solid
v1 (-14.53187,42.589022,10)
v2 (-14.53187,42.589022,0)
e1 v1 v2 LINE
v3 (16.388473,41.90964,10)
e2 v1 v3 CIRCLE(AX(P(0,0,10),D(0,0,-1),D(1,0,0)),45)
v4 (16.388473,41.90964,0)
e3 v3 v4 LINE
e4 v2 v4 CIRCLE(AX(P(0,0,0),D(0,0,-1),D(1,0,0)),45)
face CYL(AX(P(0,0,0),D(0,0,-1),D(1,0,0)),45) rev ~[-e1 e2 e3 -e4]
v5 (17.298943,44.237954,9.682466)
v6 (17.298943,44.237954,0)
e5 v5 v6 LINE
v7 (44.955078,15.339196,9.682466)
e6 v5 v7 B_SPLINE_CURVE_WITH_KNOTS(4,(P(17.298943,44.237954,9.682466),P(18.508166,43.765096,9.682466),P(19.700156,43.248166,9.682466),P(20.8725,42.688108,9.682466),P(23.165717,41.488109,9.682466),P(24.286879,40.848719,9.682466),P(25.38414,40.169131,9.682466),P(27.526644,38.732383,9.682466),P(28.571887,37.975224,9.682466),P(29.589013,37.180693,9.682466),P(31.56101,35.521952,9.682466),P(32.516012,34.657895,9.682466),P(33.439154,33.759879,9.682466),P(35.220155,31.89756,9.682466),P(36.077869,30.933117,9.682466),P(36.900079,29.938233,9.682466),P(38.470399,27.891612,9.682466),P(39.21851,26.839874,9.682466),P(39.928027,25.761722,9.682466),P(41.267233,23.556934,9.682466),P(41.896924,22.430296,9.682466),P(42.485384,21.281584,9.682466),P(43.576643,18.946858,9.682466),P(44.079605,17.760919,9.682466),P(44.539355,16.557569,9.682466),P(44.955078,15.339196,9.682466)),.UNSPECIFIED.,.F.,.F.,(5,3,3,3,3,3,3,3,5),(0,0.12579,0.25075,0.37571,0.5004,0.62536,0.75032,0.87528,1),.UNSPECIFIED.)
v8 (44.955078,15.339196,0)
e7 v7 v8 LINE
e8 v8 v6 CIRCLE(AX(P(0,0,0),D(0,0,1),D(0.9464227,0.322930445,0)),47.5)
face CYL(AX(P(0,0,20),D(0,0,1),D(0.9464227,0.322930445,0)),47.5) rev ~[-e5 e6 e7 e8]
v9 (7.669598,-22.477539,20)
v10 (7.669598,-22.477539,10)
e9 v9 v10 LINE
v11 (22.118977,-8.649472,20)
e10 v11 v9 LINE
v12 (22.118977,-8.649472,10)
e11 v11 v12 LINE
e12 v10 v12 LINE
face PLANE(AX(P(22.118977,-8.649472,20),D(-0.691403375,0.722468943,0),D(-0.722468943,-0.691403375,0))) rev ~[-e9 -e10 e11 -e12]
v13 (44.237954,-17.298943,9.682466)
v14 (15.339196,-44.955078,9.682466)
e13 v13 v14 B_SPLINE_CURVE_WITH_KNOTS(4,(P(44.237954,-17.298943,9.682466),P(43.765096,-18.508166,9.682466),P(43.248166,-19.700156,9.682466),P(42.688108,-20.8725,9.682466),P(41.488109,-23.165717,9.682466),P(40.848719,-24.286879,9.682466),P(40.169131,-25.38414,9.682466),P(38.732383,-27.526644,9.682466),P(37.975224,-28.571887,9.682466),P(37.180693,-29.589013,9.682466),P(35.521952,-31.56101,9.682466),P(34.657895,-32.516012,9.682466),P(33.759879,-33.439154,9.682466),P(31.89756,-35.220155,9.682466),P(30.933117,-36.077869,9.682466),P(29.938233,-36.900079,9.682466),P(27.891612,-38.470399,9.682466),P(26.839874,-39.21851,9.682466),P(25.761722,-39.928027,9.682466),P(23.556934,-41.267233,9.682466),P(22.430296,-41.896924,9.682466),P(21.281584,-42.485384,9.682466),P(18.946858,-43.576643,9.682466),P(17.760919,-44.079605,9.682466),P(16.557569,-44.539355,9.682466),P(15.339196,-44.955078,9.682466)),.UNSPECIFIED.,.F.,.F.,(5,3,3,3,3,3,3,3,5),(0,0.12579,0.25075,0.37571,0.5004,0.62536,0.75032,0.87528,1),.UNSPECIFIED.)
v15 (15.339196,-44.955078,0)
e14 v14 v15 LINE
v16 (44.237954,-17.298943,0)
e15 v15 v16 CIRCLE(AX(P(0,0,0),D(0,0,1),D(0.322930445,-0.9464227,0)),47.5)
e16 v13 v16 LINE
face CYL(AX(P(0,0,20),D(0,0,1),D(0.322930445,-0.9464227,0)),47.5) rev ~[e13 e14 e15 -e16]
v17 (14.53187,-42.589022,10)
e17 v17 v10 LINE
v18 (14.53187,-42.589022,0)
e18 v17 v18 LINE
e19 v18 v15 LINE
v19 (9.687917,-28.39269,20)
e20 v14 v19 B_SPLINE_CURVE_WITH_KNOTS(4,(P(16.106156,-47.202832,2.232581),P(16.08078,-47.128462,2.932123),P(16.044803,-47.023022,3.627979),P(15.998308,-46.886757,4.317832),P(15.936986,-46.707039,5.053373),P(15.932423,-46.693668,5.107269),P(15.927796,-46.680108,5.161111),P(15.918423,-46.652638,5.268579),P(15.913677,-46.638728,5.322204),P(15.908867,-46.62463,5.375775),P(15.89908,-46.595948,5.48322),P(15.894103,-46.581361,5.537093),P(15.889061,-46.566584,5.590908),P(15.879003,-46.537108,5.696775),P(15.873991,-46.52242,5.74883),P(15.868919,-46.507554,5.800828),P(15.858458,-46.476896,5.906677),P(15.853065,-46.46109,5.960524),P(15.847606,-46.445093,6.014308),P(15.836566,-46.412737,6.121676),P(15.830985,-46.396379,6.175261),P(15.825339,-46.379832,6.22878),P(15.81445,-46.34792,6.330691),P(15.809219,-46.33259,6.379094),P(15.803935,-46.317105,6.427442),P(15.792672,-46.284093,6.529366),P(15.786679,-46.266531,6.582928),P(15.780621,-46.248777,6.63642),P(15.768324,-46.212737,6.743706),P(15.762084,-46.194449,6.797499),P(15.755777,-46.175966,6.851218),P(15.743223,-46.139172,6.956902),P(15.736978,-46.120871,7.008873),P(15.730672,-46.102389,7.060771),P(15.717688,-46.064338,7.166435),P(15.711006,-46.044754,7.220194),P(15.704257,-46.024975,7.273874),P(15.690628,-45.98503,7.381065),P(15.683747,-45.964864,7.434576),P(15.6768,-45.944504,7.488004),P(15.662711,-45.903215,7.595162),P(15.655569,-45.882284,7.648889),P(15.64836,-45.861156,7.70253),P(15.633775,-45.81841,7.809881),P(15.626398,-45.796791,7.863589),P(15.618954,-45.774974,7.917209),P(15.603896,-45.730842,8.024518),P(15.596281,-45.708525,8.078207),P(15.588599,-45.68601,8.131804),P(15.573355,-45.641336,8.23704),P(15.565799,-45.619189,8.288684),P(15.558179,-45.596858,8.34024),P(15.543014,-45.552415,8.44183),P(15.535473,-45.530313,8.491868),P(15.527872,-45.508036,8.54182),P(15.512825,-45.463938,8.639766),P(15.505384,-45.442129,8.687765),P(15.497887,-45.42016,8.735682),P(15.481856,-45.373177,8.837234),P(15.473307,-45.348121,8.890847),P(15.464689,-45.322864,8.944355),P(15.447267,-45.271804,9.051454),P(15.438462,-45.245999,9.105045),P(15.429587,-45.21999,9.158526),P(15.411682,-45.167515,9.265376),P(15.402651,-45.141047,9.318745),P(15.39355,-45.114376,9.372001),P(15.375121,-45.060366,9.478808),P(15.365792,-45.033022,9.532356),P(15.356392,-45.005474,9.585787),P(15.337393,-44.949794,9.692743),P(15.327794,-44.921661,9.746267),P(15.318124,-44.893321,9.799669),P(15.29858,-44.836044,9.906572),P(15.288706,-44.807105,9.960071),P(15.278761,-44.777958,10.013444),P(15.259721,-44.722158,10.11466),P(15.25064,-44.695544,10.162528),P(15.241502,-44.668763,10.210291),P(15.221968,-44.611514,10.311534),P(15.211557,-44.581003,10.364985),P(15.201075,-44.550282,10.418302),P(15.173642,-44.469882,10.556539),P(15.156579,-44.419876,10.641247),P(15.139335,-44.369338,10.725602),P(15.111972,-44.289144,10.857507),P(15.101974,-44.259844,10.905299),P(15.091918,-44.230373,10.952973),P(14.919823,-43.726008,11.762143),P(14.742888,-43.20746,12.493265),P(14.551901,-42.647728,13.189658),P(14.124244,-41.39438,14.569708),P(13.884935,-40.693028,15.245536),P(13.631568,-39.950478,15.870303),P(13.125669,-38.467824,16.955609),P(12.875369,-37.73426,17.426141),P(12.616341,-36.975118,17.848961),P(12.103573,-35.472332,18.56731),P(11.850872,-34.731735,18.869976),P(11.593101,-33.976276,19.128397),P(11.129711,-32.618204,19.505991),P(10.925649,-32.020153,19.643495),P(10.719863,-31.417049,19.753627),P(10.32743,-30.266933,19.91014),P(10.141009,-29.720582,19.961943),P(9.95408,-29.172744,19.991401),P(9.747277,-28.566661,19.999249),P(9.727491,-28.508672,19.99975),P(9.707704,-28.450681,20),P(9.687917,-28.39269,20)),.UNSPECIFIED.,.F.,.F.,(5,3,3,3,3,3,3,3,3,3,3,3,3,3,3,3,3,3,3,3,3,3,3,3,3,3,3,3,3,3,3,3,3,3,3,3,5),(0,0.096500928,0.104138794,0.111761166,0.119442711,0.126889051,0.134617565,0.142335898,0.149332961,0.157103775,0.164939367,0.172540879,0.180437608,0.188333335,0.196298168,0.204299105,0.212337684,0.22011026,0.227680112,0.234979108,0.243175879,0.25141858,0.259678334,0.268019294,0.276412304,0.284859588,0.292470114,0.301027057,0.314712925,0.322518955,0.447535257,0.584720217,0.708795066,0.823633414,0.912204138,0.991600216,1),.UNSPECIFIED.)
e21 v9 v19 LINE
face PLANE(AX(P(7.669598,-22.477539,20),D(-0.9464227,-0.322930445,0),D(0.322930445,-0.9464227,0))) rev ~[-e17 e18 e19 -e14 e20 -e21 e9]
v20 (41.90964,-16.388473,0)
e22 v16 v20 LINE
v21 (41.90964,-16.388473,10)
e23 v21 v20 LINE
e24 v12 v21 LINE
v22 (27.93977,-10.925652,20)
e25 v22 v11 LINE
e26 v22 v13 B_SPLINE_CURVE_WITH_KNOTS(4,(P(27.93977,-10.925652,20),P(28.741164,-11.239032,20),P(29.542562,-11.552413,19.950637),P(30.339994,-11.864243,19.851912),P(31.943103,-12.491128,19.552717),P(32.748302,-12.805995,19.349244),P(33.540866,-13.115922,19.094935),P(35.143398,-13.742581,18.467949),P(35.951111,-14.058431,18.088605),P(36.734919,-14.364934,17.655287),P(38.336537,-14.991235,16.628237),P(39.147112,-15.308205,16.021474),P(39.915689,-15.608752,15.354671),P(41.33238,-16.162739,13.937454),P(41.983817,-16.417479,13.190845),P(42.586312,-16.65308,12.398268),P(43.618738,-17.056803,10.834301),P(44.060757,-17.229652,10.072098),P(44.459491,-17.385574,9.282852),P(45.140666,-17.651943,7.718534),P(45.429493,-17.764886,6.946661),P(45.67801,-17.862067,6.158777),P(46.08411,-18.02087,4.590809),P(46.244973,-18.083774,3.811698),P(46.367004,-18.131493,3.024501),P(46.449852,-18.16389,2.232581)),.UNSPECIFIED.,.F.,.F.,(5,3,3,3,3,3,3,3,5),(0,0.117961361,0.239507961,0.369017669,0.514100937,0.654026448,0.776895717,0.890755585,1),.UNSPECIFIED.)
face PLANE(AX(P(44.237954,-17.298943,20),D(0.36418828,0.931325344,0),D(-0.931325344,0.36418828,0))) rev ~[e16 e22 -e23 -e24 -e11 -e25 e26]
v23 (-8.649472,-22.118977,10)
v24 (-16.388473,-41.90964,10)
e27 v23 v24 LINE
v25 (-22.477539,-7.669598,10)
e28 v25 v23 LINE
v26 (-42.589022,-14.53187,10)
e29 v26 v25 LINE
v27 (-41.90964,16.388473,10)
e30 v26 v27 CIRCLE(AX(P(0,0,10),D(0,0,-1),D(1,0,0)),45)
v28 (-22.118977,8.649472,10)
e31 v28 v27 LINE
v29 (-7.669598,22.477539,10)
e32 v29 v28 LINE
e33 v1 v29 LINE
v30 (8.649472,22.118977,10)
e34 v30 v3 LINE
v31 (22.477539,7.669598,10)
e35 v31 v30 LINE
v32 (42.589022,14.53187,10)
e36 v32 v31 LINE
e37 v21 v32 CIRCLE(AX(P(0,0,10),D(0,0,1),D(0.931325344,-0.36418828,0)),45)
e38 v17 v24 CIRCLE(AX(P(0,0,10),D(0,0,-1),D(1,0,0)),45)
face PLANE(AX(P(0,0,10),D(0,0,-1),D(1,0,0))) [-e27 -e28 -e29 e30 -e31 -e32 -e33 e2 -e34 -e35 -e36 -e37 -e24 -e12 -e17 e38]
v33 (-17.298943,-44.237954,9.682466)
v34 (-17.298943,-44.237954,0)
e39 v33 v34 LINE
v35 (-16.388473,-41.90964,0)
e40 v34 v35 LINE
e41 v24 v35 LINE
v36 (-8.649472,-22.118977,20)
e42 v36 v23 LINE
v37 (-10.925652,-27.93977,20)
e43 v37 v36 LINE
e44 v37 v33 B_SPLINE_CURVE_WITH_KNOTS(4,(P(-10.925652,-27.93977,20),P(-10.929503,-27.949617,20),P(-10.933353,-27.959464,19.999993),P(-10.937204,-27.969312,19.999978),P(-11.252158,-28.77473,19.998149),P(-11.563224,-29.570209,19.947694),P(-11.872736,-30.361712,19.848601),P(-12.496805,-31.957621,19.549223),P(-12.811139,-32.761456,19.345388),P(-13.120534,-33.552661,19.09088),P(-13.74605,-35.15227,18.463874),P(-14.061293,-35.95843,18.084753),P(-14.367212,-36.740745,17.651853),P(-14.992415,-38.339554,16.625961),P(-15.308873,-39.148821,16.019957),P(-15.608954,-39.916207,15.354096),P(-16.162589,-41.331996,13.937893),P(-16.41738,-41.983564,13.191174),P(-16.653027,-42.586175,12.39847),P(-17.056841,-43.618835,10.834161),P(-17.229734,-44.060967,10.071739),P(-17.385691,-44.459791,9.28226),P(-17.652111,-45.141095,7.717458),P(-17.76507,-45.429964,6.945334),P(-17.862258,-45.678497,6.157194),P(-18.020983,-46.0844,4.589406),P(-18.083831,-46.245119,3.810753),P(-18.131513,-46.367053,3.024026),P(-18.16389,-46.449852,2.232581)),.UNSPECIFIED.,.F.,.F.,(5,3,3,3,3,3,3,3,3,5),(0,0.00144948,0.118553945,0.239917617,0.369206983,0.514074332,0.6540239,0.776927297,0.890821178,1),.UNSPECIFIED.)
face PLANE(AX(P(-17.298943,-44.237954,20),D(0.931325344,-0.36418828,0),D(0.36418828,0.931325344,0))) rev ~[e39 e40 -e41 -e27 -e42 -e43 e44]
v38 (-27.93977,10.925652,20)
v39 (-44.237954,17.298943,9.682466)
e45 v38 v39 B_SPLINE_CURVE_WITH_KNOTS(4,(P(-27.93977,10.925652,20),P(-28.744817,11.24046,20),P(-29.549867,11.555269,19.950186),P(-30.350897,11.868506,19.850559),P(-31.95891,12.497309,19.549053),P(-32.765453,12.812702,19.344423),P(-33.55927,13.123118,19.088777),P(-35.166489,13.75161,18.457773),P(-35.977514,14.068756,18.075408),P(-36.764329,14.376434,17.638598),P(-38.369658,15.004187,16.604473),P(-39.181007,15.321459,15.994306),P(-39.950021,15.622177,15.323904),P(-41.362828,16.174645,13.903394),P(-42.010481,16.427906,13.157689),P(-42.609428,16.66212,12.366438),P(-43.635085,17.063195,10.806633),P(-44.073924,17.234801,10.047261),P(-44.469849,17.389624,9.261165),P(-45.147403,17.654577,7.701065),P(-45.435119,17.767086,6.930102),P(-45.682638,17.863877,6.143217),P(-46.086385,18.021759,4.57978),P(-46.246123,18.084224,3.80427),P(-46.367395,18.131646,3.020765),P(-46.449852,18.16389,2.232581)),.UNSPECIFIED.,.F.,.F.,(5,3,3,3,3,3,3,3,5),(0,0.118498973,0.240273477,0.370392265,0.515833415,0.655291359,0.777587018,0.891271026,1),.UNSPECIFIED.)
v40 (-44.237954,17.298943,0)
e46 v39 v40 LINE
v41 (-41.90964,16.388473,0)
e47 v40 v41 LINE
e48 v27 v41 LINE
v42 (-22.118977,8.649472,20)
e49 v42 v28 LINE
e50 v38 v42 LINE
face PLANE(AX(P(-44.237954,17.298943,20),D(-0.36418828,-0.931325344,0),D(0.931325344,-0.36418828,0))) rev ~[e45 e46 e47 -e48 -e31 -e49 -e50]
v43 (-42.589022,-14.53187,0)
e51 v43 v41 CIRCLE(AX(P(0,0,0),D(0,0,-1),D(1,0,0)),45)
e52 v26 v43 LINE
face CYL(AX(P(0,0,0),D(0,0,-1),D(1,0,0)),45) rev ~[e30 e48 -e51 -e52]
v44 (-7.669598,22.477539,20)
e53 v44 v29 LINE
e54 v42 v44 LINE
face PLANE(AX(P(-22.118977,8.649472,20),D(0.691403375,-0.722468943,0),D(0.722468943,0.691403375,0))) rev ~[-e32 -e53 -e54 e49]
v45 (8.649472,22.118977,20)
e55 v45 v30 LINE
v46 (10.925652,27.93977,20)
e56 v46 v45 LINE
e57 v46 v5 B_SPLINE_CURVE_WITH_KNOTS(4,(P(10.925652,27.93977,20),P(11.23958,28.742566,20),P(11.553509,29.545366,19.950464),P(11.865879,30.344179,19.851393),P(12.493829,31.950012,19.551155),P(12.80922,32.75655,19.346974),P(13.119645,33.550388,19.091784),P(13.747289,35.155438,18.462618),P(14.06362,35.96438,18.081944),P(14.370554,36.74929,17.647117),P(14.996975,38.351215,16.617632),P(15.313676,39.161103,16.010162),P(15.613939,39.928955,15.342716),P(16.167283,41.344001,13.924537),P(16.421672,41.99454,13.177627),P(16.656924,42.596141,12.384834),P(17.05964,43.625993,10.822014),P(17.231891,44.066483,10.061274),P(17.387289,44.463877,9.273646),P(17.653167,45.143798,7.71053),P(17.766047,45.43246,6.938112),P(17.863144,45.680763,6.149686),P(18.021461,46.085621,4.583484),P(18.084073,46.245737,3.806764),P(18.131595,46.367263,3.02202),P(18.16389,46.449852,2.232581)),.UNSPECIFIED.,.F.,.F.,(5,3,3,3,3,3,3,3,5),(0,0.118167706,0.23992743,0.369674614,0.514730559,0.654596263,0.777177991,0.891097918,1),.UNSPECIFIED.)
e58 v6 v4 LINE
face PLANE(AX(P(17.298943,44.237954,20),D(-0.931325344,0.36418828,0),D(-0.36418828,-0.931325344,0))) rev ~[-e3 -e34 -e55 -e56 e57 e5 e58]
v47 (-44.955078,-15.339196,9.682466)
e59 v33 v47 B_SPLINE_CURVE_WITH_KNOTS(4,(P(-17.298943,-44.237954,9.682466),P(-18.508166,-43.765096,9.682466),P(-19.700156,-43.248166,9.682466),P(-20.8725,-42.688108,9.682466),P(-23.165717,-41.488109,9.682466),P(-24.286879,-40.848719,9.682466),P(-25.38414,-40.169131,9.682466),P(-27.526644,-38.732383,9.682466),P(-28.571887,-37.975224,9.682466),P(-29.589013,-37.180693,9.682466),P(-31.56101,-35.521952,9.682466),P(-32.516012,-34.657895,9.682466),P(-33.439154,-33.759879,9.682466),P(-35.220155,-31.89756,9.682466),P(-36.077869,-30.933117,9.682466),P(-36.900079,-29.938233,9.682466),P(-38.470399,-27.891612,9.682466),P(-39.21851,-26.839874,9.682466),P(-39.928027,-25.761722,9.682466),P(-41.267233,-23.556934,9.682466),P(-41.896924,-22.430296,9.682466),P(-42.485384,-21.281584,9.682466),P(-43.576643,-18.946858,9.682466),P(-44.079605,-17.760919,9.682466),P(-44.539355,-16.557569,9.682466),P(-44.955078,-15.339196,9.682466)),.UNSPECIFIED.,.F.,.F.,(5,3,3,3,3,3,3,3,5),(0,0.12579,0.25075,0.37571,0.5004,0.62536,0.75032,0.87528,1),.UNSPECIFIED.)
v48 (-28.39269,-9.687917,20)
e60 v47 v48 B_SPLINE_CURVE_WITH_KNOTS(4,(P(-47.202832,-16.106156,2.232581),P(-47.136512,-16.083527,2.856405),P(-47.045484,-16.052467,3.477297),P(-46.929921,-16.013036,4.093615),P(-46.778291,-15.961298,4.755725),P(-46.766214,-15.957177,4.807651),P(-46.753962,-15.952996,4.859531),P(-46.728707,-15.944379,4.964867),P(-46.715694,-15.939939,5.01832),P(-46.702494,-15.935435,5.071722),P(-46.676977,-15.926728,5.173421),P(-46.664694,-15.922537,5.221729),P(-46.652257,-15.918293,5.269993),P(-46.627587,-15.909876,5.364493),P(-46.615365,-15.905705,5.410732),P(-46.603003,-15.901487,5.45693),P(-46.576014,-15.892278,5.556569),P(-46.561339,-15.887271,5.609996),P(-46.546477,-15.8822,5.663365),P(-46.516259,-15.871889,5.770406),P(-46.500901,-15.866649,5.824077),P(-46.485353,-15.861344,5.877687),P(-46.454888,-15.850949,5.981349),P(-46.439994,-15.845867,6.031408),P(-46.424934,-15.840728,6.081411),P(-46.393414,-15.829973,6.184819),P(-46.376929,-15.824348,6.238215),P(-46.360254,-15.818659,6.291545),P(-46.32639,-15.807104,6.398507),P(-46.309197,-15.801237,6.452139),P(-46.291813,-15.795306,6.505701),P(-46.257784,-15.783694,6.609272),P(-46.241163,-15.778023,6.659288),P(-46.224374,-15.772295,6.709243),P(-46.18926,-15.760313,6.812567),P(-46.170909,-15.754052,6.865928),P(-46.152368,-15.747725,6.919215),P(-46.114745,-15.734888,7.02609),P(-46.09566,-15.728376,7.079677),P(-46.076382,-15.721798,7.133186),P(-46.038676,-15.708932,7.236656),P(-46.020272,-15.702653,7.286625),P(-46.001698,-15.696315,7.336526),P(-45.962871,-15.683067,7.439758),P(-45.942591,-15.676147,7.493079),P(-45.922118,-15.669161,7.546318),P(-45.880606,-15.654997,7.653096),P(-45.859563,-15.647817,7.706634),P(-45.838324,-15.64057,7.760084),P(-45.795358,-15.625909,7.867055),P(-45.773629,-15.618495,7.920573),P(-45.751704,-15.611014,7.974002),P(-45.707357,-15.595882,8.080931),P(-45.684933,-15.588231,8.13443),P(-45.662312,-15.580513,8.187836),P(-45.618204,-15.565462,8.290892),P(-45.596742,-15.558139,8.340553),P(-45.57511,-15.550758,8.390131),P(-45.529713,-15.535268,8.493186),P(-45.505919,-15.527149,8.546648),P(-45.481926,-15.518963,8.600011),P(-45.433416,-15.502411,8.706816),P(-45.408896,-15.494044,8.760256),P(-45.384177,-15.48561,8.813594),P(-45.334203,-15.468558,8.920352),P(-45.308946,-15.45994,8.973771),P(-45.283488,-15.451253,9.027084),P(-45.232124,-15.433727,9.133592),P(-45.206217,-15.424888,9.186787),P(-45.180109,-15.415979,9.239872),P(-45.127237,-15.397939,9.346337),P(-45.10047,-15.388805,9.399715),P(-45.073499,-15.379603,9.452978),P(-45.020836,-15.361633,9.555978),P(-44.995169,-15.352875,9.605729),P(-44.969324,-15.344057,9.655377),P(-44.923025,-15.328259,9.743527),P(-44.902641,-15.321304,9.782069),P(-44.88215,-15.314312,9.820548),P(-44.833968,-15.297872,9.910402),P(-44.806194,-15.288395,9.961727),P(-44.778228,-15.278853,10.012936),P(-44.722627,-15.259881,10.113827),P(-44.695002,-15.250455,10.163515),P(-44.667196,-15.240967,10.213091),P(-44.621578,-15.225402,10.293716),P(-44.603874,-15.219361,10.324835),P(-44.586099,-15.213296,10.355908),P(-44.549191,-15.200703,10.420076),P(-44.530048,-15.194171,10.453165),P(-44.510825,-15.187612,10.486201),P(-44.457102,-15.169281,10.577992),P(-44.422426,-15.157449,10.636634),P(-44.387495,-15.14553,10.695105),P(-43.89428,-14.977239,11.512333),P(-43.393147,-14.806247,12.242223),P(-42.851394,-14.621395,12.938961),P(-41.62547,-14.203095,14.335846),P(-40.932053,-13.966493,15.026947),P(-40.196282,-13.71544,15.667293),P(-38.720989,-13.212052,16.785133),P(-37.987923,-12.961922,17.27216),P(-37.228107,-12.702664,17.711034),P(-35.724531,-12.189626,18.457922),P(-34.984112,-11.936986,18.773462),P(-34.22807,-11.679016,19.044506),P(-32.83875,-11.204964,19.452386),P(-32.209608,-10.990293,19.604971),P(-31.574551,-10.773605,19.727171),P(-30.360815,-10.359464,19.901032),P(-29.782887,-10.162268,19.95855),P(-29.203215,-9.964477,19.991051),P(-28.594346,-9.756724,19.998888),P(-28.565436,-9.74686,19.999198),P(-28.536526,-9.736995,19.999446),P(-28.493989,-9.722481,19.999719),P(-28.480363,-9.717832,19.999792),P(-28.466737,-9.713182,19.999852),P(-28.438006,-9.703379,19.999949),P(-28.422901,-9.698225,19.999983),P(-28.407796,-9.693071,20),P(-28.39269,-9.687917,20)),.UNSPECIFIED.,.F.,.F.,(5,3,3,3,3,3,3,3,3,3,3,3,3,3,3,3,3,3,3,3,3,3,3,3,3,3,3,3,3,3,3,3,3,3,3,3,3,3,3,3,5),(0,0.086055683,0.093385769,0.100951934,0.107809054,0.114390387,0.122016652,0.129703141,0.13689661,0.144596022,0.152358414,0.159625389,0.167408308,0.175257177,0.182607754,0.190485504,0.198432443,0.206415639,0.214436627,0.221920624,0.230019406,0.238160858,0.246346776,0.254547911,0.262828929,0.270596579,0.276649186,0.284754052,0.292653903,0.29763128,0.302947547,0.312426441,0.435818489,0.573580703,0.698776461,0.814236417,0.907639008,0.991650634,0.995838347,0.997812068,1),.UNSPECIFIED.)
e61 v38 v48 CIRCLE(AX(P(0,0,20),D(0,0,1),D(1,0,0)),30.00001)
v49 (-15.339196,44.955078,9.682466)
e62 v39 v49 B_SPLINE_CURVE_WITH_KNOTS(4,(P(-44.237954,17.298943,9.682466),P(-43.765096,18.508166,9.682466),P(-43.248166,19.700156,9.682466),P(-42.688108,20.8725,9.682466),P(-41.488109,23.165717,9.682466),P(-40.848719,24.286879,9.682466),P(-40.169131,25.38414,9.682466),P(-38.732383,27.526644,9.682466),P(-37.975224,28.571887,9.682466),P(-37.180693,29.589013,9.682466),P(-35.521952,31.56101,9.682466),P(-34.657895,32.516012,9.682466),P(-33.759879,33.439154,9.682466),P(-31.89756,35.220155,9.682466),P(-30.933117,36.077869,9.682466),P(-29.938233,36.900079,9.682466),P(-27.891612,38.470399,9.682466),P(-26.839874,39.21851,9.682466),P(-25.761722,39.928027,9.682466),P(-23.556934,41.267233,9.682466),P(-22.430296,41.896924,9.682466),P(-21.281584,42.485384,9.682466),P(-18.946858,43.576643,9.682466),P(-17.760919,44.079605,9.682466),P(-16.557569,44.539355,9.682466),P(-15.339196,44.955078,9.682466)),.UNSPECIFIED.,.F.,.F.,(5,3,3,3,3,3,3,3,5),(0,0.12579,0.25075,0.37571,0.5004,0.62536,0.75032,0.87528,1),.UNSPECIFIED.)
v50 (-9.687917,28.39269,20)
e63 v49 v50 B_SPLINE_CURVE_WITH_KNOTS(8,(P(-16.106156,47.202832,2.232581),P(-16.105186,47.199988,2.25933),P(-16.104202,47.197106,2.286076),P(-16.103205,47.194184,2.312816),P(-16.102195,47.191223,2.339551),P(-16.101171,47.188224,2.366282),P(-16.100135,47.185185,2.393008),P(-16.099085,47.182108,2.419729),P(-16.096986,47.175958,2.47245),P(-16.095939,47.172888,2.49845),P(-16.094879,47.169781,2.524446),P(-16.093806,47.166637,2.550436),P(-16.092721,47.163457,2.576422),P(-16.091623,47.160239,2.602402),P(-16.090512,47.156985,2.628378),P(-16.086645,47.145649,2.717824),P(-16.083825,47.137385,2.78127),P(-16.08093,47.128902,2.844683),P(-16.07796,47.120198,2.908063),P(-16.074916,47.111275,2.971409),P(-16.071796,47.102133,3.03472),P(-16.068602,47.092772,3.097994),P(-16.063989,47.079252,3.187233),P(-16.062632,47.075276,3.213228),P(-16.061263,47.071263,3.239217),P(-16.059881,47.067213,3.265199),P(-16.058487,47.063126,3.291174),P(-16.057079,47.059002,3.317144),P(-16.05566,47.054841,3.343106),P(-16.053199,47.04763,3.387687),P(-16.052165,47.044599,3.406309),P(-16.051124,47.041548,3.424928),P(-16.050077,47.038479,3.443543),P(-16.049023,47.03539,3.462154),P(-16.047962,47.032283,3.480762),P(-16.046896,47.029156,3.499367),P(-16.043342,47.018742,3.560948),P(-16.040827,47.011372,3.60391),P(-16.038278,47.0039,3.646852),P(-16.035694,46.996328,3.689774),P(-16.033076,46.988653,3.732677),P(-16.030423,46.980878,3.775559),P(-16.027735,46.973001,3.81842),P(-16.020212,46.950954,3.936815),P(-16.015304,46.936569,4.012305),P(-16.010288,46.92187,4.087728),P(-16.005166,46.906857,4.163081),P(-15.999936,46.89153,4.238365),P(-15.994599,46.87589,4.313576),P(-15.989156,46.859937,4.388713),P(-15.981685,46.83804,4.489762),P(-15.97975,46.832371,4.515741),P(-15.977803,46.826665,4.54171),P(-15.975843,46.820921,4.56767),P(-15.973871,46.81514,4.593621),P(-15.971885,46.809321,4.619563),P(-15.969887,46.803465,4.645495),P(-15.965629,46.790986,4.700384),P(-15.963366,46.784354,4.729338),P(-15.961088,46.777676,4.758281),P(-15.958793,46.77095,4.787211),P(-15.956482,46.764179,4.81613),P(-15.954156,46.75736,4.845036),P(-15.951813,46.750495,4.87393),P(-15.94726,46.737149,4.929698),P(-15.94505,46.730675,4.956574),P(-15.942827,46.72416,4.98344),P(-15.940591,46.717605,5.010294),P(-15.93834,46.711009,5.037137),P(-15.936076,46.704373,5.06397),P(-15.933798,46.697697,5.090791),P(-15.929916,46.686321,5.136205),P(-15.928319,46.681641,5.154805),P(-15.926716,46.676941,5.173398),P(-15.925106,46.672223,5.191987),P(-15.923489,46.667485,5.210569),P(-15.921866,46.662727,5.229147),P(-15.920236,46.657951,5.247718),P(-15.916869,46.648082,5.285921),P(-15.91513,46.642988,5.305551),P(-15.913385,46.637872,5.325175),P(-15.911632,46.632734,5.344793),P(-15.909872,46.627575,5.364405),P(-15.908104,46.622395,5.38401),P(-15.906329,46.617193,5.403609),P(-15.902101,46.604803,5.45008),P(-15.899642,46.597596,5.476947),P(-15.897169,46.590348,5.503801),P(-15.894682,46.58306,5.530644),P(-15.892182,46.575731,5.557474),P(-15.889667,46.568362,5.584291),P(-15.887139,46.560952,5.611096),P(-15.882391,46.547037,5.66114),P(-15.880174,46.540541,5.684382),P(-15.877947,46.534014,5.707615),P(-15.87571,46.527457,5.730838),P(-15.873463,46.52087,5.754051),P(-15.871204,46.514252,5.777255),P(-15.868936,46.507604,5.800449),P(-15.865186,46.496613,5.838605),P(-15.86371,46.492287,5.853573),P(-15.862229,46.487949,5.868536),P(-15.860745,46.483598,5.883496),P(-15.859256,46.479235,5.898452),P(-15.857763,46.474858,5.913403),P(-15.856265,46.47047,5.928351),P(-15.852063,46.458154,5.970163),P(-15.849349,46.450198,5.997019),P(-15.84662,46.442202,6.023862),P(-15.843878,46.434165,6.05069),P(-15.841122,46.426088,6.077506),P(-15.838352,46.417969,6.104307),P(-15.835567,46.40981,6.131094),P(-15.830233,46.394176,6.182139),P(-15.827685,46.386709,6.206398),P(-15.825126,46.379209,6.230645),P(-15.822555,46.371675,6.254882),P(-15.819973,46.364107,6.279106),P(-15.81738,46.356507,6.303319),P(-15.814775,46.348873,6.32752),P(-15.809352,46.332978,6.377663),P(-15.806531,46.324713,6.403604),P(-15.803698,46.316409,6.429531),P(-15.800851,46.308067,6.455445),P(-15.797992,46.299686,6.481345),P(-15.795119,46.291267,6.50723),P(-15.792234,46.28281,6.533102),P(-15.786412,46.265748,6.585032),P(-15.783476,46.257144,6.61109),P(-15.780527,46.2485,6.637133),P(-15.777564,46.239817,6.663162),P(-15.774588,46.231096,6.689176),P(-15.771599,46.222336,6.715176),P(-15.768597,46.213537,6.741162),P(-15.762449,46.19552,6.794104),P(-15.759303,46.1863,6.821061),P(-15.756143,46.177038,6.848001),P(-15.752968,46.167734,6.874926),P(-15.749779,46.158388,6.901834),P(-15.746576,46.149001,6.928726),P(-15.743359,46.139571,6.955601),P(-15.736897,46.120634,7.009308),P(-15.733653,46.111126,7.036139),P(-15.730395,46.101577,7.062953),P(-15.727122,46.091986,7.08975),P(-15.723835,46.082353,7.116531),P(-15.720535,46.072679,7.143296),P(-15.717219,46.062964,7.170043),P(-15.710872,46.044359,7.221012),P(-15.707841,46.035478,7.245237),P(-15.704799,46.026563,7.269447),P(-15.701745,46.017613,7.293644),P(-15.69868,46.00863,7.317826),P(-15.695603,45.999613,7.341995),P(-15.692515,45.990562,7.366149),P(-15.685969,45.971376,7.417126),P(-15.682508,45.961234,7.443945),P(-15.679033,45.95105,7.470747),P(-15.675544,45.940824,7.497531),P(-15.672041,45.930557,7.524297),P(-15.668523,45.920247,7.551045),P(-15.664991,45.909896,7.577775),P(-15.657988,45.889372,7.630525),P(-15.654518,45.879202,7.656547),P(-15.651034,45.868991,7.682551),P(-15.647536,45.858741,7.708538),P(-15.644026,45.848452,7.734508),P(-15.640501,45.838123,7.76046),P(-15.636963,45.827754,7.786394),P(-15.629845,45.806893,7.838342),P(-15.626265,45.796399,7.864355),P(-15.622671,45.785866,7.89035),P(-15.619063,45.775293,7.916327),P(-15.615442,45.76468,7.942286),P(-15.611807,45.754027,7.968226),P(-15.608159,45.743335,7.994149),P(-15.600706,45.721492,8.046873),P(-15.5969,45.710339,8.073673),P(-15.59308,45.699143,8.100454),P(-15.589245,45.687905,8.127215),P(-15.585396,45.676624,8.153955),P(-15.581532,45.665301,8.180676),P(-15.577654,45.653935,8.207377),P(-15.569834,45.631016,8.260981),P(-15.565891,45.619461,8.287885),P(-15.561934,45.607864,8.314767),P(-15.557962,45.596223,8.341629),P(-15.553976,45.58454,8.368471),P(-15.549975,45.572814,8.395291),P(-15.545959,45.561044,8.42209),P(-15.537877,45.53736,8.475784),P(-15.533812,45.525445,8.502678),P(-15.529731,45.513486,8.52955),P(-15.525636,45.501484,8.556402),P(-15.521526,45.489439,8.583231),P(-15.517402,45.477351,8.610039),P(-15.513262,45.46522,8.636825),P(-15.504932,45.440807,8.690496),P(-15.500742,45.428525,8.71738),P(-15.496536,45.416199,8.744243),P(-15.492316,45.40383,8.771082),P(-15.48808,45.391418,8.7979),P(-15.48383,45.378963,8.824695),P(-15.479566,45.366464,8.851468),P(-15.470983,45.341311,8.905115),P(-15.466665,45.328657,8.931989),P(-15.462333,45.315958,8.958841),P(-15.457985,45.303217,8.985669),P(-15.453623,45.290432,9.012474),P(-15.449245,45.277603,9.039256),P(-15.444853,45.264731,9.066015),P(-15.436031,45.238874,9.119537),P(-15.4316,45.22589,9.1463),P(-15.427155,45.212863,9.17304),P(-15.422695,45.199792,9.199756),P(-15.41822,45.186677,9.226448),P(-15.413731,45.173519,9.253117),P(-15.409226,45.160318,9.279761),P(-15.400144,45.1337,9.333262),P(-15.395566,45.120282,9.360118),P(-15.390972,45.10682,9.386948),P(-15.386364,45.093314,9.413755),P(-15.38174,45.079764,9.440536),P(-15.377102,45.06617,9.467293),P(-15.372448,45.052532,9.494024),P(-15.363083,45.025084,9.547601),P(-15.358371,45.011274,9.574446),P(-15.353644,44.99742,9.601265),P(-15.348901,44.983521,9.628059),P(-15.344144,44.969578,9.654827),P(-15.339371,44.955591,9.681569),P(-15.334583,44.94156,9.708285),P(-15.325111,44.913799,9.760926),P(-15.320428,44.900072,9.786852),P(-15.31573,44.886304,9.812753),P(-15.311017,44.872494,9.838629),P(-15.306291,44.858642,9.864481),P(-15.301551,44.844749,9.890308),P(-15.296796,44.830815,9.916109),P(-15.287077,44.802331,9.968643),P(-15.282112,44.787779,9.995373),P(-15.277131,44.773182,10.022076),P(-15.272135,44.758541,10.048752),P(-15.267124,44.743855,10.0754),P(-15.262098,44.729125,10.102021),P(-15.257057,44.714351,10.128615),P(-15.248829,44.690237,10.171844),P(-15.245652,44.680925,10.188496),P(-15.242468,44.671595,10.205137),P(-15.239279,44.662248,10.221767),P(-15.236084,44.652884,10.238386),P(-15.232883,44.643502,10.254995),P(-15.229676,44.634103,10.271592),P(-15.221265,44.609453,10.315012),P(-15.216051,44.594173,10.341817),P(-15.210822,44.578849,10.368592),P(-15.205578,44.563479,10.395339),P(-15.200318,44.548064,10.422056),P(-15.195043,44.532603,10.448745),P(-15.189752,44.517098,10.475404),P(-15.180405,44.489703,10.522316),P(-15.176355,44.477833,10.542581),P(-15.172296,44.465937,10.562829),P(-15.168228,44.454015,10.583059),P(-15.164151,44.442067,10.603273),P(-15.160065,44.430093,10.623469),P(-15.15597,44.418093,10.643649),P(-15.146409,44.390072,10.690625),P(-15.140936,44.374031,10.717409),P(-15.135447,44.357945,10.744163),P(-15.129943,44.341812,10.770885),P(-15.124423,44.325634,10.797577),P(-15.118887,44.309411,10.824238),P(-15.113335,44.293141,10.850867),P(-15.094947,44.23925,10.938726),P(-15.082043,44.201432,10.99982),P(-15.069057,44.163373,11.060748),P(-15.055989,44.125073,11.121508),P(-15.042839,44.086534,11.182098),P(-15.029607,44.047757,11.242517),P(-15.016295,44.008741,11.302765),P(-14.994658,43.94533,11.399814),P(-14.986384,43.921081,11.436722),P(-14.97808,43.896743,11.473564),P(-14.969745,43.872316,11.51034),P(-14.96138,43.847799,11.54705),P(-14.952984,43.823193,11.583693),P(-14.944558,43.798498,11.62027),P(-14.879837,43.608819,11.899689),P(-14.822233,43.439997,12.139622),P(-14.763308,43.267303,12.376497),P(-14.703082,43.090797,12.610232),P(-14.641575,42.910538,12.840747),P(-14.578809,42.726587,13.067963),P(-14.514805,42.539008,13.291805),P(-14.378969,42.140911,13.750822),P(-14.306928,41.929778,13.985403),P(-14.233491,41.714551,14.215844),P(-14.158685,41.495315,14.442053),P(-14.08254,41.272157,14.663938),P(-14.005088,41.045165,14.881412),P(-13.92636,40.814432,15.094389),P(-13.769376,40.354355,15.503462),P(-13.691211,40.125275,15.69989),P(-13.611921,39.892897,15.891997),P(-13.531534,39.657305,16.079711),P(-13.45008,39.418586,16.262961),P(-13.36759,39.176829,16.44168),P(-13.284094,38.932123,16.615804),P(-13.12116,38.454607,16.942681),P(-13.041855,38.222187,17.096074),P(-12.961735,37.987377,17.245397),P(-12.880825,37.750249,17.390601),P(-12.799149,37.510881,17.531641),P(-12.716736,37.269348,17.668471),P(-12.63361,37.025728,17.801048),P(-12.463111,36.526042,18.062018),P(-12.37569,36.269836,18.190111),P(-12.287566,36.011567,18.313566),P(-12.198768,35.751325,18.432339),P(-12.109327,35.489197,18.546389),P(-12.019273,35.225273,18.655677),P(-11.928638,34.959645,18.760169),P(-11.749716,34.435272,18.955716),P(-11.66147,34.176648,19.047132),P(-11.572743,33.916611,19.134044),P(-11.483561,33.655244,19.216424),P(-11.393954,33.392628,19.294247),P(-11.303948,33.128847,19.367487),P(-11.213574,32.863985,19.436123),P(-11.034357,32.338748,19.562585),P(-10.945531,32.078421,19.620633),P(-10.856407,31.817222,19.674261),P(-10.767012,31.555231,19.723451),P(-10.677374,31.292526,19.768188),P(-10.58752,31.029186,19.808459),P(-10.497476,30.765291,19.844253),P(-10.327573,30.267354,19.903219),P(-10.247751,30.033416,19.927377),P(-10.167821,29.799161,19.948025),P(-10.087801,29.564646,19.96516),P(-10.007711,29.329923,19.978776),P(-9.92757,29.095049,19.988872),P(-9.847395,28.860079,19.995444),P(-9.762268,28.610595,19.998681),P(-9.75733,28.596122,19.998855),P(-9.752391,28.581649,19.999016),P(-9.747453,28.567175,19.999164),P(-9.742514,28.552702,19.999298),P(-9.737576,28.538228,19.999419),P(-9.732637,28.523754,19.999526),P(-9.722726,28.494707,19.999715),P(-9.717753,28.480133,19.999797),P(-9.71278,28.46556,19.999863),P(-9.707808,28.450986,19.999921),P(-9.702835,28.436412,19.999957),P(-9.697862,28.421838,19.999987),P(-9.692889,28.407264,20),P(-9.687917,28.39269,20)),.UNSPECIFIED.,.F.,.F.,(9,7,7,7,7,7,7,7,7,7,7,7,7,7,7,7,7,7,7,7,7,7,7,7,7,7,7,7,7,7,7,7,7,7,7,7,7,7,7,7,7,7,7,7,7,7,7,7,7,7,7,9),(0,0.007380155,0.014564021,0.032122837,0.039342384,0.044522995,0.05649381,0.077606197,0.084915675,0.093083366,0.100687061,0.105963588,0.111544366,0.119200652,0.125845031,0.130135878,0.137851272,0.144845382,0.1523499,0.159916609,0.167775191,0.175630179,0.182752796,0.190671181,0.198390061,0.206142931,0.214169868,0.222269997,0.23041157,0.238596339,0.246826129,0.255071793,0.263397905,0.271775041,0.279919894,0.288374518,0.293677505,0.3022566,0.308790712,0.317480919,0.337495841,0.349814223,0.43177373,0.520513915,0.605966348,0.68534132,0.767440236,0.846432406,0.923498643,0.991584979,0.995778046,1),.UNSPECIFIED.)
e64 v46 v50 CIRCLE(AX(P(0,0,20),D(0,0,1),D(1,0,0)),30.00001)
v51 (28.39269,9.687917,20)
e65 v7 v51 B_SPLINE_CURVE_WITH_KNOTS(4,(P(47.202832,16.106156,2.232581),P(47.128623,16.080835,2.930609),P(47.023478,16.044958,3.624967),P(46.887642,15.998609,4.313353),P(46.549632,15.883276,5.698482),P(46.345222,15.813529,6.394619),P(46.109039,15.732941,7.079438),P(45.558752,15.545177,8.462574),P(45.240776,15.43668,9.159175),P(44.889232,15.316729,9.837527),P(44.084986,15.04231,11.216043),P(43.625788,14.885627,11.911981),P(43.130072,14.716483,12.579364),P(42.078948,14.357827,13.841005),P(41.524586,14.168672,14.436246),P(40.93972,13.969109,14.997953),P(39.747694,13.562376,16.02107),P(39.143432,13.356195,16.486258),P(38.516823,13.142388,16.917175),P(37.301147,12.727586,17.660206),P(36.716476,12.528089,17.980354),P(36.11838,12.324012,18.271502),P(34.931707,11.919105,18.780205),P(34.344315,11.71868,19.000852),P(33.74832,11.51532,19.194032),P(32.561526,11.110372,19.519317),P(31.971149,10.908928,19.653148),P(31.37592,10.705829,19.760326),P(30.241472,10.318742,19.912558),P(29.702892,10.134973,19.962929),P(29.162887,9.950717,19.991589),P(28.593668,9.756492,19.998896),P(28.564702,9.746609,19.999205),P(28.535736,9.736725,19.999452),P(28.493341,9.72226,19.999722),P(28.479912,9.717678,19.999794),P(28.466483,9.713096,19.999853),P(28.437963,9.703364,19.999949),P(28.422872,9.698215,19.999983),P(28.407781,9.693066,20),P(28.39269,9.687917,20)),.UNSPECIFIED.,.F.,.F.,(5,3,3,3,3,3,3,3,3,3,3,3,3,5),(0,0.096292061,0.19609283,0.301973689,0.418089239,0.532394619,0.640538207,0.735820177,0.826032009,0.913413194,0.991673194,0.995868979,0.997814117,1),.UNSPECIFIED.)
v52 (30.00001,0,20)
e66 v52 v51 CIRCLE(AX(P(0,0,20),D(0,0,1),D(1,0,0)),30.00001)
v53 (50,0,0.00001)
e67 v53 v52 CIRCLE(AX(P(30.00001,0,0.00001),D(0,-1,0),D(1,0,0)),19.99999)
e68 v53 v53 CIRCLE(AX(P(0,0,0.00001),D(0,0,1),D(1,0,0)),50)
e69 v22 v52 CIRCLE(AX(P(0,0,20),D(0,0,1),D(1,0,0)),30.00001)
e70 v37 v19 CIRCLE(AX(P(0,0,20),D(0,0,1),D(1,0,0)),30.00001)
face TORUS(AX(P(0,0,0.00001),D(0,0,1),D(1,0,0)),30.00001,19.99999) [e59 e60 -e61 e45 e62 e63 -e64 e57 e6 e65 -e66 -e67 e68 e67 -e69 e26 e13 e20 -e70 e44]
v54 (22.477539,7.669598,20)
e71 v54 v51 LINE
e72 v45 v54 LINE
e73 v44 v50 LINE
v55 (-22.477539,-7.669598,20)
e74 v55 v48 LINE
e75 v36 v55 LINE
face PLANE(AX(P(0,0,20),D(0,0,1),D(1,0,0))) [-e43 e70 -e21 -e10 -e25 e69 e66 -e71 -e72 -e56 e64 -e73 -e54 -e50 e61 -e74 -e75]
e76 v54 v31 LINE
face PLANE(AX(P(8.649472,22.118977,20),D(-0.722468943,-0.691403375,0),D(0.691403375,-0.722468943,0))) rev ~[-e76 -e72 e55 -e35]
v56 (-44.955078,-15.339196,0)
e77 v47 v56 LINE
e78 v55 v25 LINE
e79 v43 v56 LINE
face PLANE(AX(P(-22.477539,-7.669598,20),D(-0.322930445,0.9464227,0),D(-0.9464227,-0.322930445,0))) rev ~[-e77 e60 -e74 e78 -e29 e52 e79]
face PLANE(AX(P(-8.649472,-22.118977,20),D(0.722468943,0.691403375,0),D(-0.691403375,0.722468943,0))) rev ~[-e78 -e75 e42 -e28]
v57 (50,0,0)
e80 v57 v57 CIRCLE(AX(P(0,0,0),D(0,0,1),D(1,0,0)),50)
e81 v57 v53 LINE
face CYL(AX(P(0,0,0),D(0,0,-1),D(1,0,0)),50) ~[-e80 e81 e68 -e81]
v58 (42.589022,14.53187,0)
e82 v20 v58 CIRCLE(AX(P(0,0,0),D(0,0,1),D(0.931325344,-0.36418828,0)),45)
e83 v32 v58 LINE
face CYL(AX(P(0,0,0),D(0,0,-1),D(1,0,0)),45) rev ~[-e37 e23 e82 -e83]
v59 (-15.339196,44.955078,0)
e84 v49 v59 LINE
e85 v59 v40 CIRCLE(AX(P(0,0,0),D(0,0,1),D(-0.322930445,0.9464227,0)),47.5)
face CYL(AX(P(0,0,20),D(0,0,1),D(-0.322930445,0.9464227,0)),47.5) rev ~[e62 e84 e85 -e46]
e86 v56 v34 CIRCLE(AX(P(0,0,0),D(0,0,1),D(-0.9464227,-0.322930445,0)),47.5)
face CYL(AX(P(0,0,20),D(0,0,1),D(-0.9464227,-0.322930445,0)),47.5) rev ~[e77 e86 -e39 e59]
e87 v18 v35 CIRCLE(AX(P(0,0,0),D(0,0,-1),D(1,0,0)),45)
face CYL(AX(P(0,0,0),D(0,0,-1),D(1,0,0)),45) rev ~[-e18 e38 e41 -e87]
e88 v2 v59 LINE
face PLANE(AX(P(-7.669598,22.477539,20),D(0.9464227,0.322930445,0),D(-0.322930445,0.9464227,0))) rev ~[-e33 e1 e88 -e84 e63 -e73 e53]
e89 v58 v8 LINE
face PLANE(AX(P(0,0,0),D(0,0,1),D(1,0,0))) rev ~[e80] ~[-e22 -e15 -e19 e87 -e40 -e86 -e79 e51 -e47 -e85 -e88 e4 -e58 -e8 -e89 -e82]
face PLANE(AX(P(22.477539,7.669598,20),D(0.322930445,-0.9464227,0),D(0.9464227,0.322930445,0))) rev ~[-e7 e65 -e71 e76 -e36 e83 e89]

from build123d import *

# Parameters (mm, degrees)
F0_R     = 50
F1_DEPTH = 20
F2_R     = 19.99999
F3_R     = 45
F4_DEPTH = 10
F6_DEPTH = 25


# Not quite as in the source:
# - a fillet or chamfer is up to 0.001 mm smaller than in the source, because OpenCascade refuses the exact size


with BuildPart() as f1:
    # F0 (on Top) → F1 (new body)
    with BuildSketch(Plane.XY):
        Circle(F0_R)
    extrude(amount=F1_DEPTH)

    # F2 (radius 20 in the source; OpenCascade refuses exactly that, so slightly less here)
    f2_edges = [f1.edges().sort_by_distance(p)[0] for p in [
        (-50, 0, 20),
    ]]
    fillet(f2_edges, radius=F2_R)

    # F3 (on face) → F4 (cut)
    with BuildSketch(Plane(origin=(0, 0, 0), x_dir=(1, 0, 0), z_dir=(0, 0, -1))):
        Circle(F3_R)
    extrude(amount=-F4_DEPTH, mode=Mode.SUBTRACT)

    # F5 (on face) → F6 (cut)
    with BuildSketch(Plane.XY.offset(20)):
        with BuildLine():
            Line((-22.4775391325, -7.6695980696), (-44.9550782649, -15.3391961392))
            ThreePointArc((-44.9550782649, -15.3391961392), (-34.3172747897, -32.8416602961), (-17.2989432787, -44.2379538568))
            Line((-17.2989432787, -44.2379538568), (-8.6494716394, -22.1189769284))
            Line((-8.6494716394, -22.1189769284), (-22.4775391325, -7.6695980696))
        make_face()
        with BuildLine():
            Line((-7.6695980696, 22.4775391325), (-15.3391961392, 44.9550782649))
            ThreePointArc((-15.3391961392, 44.9550782649), (-32.8416602961, 34.3172747897), (-44.2379538568, 17.2989432787))
            Line((-44.2379538568, 17.2989432787), (-22.1189769284, 8.6494716394))
            Line((-22.1189769284, 8.6494716394), (-7.6695980696, 22.4775391325))
        make_face()
        with BuildLine():
            Line((22.4775391325, 7.6695980696), (44.9550782649, 15.3391961392))
            ThreePointArc((44.9550782649, 15.3391961392), (34.3172747897, 32.8416602961), (17.2989432787, 44.2379538568))
            Line((17.2989432787, 44.2379538568), (8.6494716394, 22.1189769284))
            Line((8.6494716394, 22.1189769284), (22.4775391325, 7.6695980696))
        make_face()
        with BuildLine():
            Line((7.6695980696, -22.4775391325), (15.3391961392, -44.9550782649))
            ThreePointArc((15.3391961392, -44.9550782649), (32.8416602961, -34.3172747897), (44.2379538568, -17.2989432787))
            Line((44.2379538568, -17.2989432787), (22.1189769284, -8.6494716394))
            Line((22.1189769284, -8.6494716394), (7.6695980696, -22.4775391325))
        make_face()
    extrude(amount=-F6_DEPTH, mode=Mode.SUBTRACT)


solid = f1.part
